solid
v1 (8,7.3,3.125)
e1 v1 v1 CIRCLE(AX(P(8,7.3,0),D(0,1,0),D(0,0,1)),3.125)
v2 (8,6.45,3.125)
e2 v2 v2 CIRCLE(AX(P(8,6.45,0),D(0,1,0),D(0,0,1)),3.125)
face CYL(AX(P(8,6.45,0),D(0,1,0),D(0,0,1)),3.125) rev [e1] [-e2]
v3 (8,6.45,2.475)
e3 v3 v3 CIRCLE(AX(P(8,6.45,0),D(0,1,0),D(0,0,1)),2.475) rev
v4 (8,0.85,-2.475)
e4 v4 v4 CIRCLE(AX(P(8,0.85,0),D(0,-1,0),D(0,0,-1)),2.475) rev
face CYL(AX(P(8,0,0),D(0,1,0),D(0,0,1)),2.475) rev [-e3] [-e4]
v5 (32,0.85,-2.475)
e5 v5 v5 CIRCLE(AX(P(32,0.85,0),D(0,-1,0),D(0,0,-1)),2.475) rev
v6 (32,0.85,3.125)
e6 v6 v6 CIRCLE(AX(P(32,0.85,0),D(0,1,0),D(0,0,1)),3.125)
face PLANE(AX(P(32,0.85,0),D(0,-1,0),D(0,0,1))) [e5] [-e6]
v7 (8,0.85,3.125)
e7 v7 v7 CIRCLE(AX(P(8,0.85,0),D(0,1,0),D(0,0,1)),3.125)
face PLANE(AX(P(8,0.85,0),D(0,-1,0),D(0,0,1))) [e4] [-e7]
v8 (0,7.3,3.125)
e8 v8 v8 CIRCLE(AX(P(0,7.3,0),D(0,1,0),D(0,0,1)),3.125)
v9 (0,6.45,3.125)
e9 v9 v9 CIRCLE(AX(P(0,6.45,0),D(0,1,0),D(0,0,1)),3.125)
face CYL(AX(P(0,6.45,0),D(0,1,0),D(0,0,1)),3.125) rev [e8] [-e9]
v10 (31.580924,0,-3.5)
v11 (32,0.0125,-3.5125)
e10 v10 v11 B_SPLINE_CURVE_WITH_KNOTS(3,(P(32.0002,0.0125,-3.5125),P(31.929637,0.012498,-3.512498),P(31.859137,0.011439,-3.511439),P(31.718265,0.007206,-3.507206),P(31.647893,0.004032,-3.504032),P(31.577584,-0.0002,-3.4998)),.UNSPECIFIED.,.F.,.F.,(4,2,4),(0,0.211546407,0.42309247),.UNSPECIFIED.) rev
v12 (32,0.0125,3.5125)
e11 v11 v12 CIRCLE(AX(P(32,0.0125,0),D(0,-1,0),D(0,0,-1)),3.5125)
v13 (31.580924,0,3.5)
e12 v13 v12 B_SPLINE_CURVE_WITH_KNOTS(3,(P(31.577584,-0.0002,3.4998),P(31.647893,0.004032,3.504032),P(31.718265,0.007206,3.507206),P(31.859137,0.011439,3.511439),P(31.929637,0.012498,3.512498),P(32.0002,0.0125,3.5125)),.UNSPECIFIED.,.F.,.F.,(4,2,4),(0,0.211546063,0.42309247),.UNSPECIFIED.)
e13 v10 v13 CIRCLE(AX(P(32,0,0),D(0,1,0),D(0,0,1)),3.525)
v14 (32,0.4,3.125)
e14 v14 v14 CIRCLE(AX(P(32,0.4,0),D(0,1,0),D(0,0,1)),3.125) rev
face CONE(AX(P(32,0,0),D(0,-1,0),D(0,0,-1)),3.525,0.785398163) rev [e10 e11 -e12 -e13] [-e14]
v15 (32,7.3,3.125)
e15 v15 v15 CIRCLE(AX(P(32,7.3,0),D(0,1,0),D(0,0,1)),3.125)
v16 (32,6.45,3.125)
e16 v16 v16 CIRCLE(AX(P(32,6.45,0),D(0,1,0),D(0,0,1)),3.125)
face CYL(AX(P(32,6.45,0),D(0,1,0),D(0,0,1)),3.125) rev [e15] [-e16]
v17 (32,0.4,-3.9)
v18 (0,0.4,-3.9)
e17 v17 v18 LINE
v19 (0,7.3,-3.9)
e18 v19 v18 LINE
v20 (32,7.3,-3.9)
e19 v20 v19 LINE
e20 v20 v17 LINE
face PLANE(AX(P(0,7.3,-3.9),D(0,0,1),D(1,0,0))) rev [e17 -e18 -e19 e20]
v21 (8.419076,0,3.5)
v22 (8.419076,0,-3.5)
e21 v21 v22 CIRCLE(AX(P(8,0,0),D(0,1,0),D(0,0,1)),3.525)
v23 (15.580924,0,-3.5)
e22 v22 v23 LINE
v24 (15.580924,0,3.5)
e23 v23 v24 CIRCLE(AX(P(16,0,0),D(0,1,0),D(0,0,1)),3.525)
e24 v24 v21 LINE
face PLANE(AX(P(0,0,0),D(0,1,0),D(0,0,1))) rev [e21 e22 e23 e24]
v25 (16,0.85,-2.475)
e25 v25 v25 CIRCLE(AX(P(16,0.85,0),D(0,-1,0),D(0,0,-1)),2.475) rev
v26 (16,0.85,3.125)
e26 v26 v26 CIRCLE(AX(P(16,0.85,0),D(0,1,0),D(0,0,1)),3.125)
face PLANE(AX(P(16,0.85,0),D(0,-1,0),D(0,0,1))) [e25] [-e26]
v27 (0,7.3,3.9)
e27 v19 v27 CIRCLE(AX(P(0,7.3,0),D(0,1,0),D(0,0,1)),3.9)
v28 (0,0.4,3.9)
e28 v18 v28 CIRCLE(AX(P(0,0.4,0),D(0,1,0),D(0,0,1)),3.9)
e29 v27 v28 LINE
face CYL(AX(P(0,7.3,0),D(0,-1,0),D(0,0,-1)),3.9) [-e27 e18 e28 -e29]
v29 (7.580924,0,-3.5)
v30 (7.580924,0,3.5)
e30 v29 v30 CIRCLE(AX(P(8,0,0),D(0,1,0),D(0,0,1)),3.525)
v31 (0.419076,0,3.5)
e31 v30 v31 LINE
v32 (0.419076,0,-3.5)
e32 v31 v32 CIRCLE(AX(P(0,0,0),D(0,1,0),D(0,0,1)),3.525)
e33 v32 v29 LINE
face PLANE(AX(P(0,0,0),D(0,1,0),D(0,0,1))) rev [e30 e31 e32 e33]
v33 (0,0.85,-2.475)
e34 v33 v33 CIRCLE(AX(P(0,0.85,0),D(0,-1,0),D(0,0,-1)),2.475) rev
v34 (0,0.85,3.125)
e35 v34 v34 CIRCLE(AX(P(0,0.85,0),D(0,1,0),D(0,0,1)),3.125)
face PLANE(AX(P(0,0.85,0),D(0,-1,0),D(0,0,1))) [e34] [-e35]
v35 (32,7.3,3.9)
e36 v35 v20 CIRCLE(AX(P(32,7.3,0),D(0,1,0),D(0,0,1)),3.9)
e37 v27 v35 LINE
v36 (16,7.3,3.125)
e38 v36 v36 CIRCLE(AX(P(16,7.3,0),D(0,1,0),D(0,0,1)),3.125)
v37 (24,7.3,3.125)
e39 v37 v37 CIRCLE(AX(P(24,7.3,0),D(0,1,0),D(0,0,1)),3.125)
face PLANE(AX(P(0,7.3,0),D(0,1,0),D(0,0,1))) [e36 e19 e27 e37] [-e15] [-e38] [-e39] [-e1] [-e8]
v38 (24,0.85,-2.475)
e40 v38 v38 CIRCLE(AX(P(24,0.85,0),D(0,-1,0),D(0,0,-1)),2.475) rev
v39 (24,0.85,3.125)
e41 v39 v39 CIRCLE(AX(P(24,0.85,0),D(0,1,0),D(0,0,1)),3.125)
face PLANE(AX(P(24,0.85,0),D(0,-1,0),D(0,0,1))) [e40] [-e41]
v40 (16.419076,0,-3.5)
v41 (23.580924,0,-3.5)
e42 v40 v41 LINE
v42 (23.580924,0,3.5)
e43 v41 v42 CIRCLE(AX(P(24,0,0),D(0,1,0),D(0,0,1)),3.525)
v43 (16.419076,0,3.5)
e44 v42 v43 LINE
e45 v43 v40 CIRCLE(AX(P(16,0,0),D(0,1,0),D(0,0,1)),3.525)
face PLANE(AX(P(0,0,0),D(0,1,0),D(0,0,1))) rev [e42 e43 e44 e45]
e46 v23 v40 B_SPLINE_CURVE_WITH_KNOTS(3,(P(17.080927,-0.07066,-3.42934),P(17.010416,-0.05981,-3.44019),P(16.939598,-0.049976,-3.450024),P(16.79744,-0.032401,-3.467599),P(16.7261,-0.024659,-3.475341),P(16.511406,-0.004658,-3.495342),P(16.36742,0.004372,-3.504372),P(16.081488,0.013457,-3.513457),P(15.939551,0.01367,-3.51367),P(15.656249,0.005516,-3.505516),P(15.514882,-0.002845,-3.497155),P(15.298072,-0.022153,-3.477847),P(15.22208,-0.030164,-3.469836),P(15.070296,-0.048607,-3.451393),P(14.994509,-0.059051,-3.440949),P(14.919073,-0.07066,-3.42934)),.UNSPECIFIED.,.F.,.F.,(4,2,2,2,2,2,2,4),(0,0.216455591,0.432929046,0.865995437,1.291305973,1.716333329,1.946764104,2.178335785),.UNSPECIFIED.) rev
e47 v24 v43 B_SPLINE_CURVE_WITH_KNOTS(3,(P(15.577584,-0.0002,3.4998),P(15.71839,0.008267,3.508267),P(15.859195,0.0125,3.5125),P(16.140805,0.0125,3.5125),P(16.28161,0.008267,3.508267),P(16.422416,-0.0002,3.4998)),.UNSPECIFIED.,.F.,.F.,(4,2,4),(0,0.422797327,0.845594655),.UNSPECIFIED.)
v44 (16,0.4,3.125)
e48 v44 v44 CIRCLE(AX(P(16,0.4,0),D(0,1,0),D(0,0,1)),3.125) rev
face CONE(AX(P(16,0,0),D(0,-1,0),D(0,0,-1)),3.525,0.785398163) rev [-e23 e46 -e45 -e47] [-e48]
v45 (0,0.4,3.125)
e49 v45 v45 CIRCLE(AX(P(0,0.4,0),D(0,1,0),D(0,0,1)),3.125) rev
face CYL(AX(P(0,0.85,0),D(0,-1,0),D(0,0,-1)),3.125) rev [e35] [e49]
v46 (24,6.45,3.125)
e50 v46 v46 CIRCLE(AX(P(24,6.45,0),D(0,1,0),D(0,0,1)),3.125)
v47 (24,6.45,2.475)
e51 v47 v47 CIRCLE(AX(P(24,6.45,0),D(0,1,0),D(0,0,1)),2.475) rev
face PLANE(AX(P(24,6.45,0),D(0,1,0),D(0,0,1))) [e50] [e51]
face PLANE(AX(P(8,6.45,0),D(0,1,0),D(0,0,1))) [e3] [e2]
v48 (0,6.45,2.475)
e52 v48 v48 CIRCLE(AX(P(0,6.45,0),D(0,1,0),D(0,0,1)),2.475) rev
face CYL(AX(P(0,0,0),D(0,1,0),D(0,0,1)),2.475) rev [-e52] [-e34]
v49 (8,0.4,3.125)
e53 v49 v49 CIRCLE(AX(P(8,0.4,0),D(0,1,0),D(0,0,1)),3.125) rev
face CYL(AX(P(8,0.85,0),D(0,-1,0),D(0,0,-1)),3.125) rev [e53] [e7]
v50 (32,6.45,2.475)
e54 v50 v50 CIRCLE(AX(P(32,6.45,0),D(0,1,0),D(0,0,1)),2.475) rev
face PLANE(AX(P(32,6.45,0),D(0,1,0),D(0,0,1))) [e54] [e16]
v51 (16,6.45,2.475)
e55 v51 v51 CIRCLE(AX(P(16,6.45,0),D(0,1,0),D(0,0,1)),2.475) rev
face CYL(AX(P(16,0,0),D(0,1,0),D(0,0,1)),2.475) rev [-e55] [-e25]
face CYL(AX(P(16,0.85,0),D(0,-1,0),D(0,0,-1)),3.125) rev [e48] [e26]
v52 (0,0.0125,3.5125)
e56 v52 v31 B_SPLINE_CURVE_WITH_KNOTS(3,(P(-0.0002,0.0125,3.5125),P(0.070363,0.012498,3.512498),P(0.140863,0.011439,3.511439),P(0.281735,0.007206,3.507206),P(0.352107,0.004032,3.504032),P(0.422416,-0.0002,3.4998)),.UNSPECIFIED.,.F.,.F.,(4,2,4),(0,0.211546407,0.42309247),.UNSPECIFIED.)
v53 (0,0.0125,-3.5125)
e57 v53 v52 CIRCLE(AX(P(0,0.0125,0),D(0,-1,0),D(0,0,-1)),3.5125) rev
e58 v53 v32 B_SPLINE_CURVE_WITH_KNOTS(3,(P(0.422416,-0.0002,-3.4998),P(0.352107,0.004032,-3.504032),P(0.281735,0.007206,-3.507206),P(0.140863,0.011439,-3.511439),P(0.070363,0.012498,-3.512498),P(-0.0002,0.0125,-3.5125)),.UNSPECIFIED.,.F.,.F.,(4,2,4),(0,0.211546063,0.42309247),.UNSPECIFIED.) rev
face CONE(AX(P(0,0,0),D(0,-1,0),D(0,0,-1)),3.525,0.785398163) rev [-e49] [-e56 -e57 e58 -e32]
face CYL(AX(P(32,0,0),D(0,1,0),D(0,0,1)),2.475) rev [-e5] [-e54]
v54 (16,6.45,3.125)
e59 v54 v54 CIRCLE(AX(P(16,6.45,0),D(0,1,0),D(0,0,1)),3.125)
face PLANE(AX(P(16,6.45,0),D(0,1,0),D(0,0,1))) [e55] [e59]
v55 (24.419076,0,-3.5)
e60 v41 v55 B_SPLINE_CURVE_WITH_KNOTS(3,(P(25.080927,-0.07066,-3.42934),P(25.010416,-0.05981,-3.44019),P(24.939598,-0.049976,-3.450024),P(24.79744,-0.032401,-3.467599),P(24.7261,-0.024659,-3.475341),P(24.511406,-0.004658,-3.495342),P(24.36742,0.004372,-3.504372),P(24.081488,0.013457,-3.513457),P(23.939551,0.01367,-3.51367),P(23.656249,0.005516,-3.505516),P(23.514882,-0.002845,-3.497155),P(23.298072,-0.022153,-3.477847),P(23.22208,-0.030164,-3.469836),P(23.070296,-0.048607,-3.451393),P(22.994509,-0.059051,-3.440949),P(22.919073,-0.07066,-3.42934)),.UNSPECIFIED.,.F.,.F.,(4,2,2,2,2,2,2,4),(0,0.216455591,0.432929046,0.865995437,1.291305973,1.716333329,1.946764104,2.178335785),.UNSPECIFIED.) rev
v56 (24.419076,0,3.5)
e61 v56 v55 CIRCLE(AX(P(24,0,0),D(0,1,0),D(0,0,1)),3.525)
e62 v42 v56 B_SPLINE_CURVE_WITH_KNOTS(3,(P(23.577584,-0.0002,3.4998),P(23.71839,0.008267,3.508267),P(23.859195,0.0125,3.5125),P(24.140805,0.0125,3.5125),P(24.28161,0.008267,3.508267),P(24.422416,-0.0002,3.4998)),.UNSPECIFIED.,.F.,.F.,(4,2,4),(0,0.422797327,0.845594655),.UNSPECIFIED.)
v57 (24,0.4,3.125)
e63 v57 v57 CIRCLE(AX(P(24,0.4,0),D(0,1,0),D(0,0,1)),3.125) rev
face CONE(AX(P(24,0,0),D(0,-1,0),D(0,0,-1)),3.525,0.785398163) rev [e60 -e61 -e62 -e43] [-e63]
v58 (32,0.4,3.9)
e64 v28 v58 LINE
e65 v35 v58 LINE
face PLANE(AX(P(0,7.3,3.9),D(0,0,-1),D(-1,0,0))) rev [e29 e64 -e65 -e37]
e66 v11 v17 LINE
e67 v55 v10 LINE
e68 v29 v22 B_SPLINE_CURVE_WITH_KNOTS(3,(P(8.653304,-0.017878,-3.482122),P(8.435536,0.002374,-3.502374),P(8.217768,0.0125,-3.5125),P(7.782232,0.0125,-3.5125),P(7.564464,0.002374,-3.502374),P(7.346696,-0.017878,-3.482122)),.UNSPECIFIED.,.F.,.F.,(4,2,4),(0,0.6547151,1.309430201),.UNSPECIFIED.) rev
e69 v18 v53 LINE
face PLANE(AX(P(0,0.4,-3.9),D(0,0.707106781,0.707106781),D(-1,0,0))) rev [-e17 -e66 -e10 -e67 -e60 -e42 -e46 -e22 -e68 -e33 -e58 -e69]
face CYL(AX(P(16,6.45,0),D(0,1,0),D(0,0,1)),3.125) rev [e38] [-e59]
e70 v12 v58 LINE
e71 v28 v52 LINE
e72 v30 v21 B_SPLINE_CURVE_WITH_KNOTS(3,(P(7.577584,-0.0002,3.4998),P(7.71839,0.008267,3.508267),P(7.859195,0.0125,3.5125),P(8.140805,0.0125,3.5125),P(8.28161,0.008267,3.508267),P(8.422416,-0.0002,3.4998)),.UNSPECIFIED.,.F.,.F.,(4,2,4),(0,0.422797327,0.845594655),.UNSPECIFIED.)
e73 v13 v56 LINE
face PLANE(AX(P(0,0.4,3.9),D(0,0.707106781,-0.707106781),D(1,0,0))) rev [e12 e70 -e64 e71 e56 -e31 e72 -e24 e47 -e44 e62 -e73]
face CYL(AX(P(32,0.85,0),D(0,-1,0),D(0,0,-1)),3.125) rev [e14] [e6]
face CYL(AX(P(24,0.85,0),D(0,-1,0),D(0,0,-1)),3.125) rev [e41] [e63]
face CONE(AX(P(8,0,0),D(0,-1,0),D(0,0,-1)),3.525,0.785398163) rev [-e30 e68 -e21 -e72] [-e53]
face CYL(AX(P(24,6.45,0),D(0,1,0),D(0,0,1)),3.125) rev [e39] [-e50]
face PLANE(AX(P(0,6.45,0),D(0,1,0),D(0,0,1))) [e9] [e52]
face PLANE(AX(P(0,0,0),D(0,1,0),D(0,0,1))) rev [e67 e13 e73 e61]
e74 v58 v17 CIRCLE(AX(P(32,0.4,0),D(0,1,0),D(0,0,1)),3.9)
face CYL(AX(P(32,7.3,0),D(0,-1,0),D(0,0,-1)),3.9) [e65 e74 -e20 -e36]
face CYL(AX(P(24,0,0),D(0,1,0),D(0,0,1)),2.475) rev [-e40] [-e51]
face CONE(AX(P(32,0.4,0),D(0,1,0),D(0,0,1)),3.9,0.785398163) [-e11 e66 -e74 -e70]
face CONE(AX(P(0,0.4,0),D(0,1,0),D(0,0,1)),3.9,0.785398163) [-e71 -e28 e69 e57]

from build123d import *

# Parameters (mm, degrees)
BOSS_EXTRUDE1_DEPTH       = 7.3
SKETCH2_R                 = 2.475
CUT_EXTRUDE1_DEPTH        = 37.841688344
SKETCH3_R                 = 3.125
CUT_EXTRUDE2_DEPTH        = 0.85
LPATTERN1_COUNT           = 5
LPATTERN1_PITCH           = 8
LPATTERN1_COPY_1_SKETCH_R = 3.125
LPATTERN1_COPY_1_DEPTH    = 0.85
LPATTERN1_COPY_2_SKETCH_R = 3.125
LPATTERN1_COPY_2_DEPTH    = 0.85
LPATTERN1_COPY_3_SKETCH_R = 3.125
LPATTERN1_COPY_3_DEPTH    = 0.85
LPATTERN1_COPY_4_SKETCH_R = 3.125
LPATTERN1_COPY_4_DEPTH    = 0.85
CHAMFER1_SIZE             = 0.4


with BuildPart() as part:
    # Sketch1 → Boss-Extrude1 (new body)
    with BuildSketch(Plane(origin=(0, 0, 0), x_dir=(1, 0, 0), z_dir=(0, 1, 0))):
        with BuildLine():
            Line((0, 3.9), (32, 3.9))
            ThreePointArc((32, 3.9), (35.9, 0), (32, -3.9))
            Line((32, -3.9), (0, -3.9))
            ThreePointArc((0, -3.9), (-3.9, 0), (0, 3.9))
        make_face()
    extrude(amount=BOSS_EXTRUDE1_DEPTH)

    # Sketch2 → Cut-Extrude1 (cut, through all)
    with BuildSketch(Plane(origin=(0, 7.3, 0), x_dir=(1, 0, 0), z_dir=(0, 1, 0))):
        with Locations(Location((0, 0, 0), (0, 0, 270))):
            Circle(SKETCH2_R)
    cut_extrude1 = extrude(amount=-CUT_EXTRUDE1_DEPTH, mode=Mode.SUBTRACT)

    # Sketch3 → Cut-Extrude2 (cut)
    with BuildSketch(Plane(origin=(0, 7.3, 0), x_dir=(1, 0, 0), z_dir=(0, 1, 0))):
        with Locations(Location((0, 0, 0), (0, 0, 270))):
            Circle(SKETCH3_R)
    cut_extrude2 = extrude(amount=-CUT_EXTRUDE2_DEPTH, mode=Mode.SUBTRACT)

    # Mirror1: Cut-Extrude2 across plane
    add(cut_extrude2.mirror(Plane.ZX.offset(3.65)), mode=Mode.SUBTRACT)

    # LPattern1: Cut-Extrude1, Cut-Extrude2 ×5
    with Locations(*[(i * LPATTERN1_PITCH, 0, 0) for i in range(1, LPATTERN1_COUNT)]):
        add(cut_extrude1, mode=Mode.SUBTRACT)
        add(cut_extrude2, mode=Mode.SUBTRACT)

    # LPattern1 copy 1 sketch → LPattern1 copy 1 (cut)
    with BuildSketch(Plane(origin=(8, 0, 0), x_dir=(1, 0, 0), z_dir=(0, -1, 0))):
        Circle(LPATTERN1_COPY_1_SKETCH_R)
    extrude(amount=-LPATTERN1_COPY_1_DEPTH, mode=Mode.SUBTRACT)

    # LPattern1 copy 2 sketch → LPattern1 copy 2 (cut)
    with BuildSketch(Plane(origin=(16, 0, 0), x_dir=(1, 0, 0), z_dir=(0, -1, 0))):
        Circle(LPATTERN1_COPY_2_SKETCH_R)
    extrude(amount=-LPATTERN1_COPY_2_DEPTH, mode=Mode.SUBTRACT)

    # LPattern1 copy 3 sketch → LPattern1 copy 3 (cut)
    with BuildSketch(Plane(origin=(24, 0, 0), x_dir=(1, 0, 0), z_dir=(0, -1, 0))):
        Circle(LPATTERN1_COPY_3_SKETCH_R)
    extrude(amount=-LPATTERN1_COPY_3_DEPTH, mode=Mode.SUBTRACT)

    # LPattern1 copy 4 sketch → LPattern1 copy 4 (cut)
    with BuildSketch(Plane(origin=(32, 0, 0), x_dir=(1, 0, 0), z_dir=(0, -1, 0))):
        Circle(LPATTERN1_COPY_4_SKETCH_R)
    extrude(amount=-LPATTERN1_COPY_4_DEPTH, mode=Mode.SUBTRACT)

    # Chamfer1
    # the kernel refuses this chamfer: 0.4 mm, written as the material it takes off along each edge
    with BuildSketch(Plane(origin=(0, 0, 0), x_dir=(0, 0, 1), z_dir=(-1, 0, 0))) as chamfer1_piece_1:
        Polygon((3.125 + CHAMFER1_SIZE, 0), (3.125, CHAMFER1_SIZE), (3.125, 0), align=None)
    revolve(axis=Axis((0, 0, 0), (0, 1, 0)), mode=Mode.SUBTRACT)
    with BuildSketch(Plane(origin=(0, 0, -3.9), x_dir=(0, 0.9996219169112968, -0.027495876610586275), z_dir=(1, 0, 0))) as chamfer1_piece_2:
        Polygon((CHAMFER1_SIZE * 0.999621916911, CHAMFER1_SIZE * 0.0274958766106), (-CHAMFER1_SIZE * 0.0274958766106, CHAMFER1_SIZE * 0.999621916911), (0, 0), align=None)
    extrude(amount=32, mode=Mode.SUBTRACT)
    with BuildSketch(Plane(origin=(32, 0, 0), x_dir=(0, 0, -1), z_dir=(-1, 0, 0))) as chamfer1_piece_3:
        Polygon((3.9, -CHAMFER1_SIZE), (3.9 - CHAMFER1_SIZE, 0), (3.9, 0), align=None)
    revolve(axis=Axis((32, 0, 0), (0, -1, 0)), revolution_arc=180, mode=Mode.SUBTRACT)
    with BuildSketch(Plane(origin=(32, 0, 3.9), x_dir=(0, -0.027495876610586386, -0.9996219169112968), z_dir=(-1, 0, 0))) as chamfer1_piece_4:
        Polygon((CHAMFER1_SIZE * 0.999621916911, -CHAMFER1_SIZE * 0.0274958766106), (-CHAMFER1_SIZE * 0.0274958766106, -CHAMFER1_SIZE * 0.999621916911), (0, 0), align=None)
    extrude(amount=32, mode=Mode.SUBTRACT)
    with BuildSketch(Plane(origin=(0, 0, 0), x_dir=(0, 0, 1), z_dir=(1, 0, 0))) as chamfer1_piece_5:
        Polygon((3.9, -CHAMFER1_SIZE), (3.9 - CHAMFER1_SIZE, 0), (3.9, 0), align=None)
    revolve(axis=Axis((0, 0, 0), (0, -1, 0)), revolution_arc=180, mode=Mode.SUBTRACT)
    with BuildSketch(Plane(origin=(8, 0, 0), x_dir=(1, 0, 0), z_dir=(0, 0, -1))) as chamfer1_piece_6:
        Polygon((3.125 + CHAMFER1_SIZE, 0), (3.125, -CHAMFER1_SIZE), (3.125, 0), align=None)
    revolve(axis=Axis((8, 0, 0), (0, -1, 0)), mode=Mode.SUBTRACT)
    with BuildSketch(Plane(origin=(16, 0, 0), x_dir=(1, 0, 0), z_dir=(0, 0, -1))) as chamfer1_piece_7:
        Polygon((3.125 + CHAMFER1_SIZE, 0), (3.125, -CHAMFER1_SIZE), (3.125, 0), align=None)
    revolve(axis=Axis((16, 0, 0), (0, -1, 0)), mode=Mode.SUBTRACT)
    with BuildSketch(Plane(origin=(24, 0, 0), x_dir=(1, 0, 0), z_dir=(0, 0, -1))) as chamfer1_piece_8:
        Polygon((3.125 + CHAMFER1_SIZE, 0), (3.125, -CHAMFER1_SIZE), (3.125, 0), align=None)
    revolve(axis=Axis((24, 0, 0), (0, -1, 0)), mode=Mode.SUBTRACT)
    with BuildSketch(Plane(origin=(32, 0, 0), x_dir=(1, 0, 0), z_dir=(0, 0, -1))) as chamfer1_piece_9:
        Polygon((3.125 + CHAMFER1_SIZE, 0), (3.125, -CHAMFER1_SIZE), (3.125, 0), align=None)
    revolve(axis=Axis((32, 0, 0), (0, -1, 0)), mode=Mode.SUBTRACT)


solid = part.part
